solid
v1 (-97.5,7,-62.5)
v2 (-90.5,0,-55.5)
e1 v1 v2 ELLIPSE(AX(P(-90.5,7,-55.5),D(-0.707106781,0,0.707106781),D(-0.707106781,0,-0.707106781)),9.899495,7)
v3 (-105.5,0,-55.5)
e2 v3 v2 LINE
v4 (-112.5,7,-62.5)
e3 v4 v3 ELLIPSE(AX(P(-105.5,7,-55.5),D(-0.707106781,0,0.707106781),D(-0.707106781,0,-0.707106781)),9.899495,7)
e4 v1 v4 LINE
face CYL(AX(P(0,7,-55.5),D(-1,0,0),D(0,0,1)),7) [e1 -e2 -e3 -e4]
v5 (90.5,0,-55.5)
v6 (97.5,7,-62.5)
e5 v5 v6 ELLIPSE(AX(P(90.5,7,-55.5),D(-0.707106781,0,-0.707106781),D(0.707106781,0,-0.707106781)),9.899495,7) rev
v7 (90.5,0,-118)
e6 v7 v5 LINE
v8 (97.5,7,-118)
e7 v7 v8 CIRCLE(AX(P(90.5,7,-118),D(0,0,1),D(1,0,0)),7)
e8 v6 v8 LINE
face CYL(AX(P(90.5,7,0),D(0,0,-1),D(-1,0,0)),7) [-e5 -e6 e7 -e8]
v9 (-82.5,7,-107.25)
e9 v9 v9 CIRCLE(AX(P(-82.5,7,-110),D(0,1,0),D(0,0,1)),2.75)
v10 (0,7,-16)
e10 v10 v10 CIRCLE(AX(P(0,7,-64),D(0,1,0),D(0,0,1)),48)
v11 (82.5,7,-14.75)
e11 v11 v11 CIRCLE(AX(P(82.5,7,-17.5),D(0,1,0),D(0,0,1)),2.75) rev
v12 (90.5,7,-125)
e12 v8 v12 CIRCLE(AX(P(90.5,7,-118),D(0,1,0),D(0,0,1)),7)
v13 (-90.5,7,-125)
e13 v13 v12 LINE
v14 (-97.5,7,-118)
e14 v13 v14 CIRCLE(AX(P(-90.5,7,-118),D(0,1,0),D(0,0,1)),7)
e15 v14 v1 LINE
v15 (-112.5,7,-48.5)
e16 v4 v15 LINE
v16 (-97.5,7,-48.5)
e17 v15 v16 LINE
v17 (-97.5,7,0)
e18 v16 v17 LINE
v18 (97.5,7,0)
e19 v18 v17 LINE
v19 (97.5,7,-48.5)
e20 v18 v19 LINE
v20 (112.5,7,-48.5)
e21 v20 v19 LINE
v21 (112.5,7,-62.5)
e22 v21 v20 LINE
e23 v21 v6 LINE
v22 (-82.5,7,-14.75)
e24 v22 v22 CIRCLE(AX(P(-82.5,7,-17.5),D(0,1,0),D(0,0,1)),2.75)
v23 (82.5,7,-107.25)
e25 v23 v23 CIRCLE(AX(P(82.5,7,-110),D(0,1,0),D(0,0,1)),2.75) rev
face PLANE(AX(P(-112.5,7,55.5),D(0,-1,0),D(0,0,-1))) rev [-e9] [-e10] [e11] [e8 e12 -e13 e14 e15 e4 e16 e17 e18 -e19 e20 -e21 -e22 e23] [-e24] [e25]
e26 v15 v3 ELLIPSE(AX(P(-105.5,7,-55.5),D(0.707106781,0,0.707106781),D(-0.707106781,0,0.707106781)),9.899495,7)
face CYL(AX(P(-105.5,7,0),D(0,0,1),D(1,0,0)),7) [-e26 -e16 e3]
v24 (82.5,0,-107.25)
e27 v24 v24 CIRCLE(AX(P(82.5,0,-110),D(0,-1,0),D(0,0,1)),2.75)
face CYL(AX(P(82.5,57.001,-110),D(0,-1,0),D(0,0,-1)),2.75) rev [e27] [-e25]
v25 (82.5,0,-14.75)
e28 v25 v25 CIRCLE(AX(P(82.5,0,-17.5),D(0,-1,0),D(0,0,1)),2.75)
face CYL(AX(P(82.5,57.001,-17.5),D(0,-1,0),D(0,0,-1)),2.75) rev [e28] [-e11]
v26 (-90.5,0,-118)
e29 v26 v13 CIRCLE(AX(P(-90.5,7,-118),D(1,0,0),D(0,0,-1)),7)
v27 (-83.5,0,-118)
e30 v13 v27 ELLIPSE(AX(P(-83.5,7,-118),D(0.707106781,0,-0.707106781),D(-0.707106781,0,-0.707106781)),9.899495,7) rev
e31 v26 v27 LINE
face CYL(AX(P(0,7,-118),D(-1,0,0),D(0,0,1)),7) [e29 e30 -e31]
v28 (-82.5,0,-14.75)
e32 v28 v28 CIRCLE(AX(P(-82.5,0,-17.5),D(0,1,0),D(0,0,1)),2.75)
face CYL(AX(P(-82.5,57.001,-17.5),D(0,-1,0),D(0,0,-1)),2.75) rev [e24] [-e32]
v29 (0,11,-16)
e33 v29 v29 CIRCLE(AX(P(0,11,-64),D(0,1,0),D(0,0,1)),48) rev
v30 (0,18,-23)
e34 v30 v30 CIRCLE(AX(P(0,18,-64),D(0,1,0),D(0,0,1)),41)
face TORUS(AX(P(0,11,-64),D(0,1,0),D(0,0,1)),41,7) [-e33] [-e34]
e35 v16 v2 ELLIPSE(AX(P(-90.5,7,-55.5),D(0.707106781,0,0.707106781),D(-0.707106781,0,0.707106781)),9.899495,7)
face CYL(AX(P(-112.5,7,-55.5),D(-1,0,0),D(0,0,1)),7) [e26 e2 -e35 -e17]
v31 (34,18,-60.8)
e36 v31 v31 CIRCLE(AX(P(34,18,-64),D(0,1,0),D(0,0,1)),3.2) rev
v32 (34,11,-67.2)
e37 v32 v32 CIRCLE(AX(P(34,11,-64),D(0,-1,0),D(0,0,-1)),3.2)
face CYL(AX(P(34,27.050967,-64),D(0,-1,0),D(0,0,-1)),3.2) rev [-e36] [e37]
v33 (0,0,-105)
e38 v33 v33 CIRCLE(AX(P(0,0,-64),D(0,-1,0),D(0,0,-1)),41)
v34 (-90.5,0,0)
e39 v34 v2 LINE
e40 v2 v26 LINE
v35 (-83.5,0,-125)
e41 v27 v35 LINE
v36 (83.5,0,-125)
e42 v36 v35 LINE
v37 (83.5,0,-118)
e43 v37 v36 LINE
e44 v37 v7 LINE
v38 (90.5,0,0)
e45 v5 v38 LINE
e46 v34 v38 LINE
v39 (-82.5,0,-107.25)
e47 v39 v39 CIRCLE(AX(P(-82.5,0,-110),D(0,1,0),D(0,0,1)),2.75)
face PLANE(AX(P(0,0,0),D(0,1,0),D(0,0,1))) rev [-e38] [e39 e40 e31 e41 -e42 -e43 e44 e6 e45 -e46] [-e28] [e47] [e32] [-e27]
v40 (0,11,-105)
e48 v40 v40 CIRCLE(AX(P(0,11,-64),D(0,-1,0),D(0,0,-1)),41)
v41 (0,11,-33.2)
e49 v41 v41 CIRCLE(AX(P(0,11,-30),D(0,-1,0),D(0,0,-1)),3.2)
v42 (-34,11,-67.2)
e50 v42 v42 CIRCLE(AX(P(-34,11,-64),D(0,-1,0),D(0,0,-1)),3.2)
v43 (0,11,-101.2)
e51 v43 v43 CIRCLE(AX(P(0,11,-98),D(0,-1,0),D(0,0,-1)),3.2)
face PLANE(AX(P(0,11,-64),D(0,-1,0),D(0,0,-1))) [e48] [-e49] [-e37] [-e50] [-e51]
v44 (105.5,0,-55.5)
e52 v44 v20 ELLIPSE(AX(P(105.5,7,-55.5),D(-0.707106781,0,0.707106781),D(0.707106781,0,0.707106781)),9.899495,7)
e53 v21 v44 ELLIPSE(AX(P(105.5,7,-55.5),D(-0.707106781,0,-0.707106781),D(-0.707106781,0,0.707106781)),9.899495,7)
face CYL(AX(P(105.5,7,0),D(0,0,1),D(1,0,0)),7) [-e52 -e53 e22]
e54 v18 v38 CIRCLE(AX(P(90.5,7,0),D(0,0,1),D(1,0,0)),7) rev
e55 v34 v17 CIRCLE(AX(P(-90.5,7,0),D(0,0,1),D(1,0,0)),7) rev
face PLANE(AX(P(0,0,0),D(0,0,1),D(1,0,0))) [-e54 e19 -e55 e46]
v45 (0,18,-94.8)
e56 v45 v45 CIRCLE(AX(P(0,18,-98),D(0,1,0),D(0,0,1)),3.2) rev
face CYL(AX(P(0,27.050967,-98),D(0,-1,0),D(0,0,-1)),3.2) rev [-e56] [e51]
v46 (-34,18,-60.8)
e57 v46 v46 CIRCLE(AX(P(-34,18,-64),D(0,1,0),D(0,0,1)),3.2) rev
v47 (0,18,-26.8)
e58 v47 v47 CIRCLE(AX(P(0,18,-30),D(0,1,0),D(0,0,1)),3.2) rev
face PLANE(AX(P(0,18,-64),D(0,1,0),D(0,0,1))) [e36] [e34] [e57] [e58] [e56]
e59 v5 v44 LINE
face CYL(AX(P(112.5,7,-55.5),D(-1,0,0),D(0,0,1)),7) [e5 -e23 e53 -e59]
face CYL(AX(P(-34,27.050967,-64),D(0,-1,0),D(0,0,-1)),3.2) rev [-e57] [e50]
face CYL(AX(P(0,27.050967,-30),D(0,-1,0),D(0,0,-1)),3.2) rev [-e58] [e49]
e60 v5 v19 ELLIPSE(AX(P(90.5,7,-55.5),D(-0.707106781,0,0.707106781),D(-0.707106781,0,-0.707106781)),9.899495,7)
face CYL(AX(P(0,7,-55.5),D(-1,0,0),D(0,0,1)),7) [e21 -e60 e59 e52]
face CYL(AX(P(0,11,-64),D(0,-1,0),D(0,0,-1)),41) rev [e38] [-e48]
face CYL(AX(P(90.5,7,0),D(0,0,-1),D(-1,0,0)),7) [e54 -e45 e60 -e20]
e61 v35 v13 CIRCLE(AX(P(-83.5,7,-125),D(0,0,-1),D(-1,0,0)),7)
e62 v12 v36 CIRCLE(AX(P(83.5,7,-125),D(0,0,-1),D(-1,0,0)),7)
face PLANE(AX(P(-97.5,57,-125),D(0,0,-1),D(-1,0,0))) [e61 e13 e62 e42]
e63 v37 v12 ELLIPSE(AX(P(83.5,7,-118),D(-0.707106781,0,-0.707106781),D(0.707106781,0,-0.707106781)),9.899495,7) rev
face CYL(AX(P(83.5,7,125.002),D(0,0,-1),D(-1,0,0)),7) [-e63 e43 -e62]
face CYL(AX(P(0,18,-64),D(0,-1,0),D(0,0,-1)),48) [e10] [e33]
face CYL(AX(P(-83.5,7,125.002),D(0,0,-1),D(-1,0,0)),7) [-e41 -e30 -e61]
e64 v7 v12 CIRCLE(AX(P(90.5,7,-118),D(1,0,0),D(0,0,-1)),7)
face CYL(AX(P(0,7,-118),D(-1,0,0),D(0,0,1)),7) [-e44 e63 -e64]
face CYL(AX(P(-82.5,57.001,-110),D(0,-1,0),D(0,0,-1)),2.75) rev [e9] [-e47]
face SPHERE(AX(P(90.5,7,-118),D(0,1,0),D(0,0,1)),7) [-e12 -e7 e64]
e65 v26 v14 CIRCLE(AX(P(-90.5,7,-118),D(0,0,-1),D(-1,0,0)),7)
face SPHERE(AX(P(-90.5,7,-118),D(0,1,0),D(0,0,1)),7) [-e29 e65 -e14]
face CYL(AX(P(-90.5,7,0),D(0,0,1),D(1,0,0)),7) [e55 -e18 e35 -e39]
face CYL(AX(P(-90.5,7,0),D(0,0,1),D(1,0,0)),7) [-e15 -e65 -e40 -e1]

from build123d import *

# Parameters (mm, degrees)
SKETCH2_W               = 195
SKETCH2_H               = 125
BOSS_EXTRUDE1_DEPTH     = 57
SKETCH3_W               = 181
SKETCH3_H               = 118
CUT_EXTRUDE1_DEPTH      = 50
BOSS_EXTRUDE2_DEPTH     = 15
CUT_EXTRUDE4_REACH      = 179.568
SKETCH7_R               = 2.75
SKETCH34_R              = 2
SKETCH34_W              = 22
SKETCH34_H              = 42
CUT_EXTRUDE8_DEPTH      = 7
MIRROR2_COPY_1_DEPTH    = 15
MIRROR2_COPY_2_REACH    = 179.568
MIRROR2_COPY_2_SKETCH_R = 2.75
MIRROR2_COPY_3_SKETCH_R = 2
MIRROR2_COPY_3_SKETCH_W = 22
MIRROR2_COPY_3_SKETCH_H = 42
MIRROR2_COPY_3_DEPTH    = 7
FILLET2_R               = 7
FILLET7_R               = 7
BOSS_EXTRUDE8_REACH     = 282.009
BOSS_EXTRUDE9_REACH     = 282.009
SKETCH29_W              = 460.325022979
SKETCH29_H              = 444.411594697
CUT_EXTRUDE5_DEPTH      = 50
SKETCH30_R              = 48
BOSS_EXTRUDE10_DEPTH    = 11
SKETCH31_R              = 41
CUT_EXTRUDE6_DEPTH      = 11
SKETCH32_R              = 3.2
CUT_EXTRUDE7_DEPTH      = 7
FILLET8_R               = 7
FILLET11_R              = 6.3
SKETCH37_W              = 42
SKETCH37_H              = 75
BOSS_EXTRUDE11_DEPTH    = 7
SKETCH39_W              = 259.645658498
SKETCH39_H              = 116.30884873
CUT_EXTRUDE9_DEPTH      = 125


with BuildPart() as part:
    # Sketch2 → Boss-Extrude1 (new body)
    with BuildSketch(Plane(origin=(0, 0, 0), x_dir=(1, 0, 0), z_dir=(0, 1, 0))):
        with Locations((0, -62.5)):
            Rectangle(SKETCH2_W, SKETCH2_H)
    boss_extrude1 = extrude(amount=BOSS_EXTRUDE1_DEPTH)

    # Sketch3 → Cut-Extrude1 (cut)
    with BuildSketch(Plane(origin=(0, 57, 0), x_dir=(1, 0, 0), z_dir=(0, 1, 0))):
        with Locations((0, -59)):
            Rectangle(SKETCH3_W, SKETCH3_H)
    cut_extrude1 = extrude(amount=-CUT_EXTRUDE1_DEPTH, mode=Mode.SUBTRACT)

    # Sketch5 → Boss-Extrude2 (add)
    with BuildSketch(Plane.ZY.offset(97.5)):
        Polygon((48.5, 7), (48.5, 0), (62.5, 0), (62.5, 57), (55.5, 57), (55.5, 7), align=None)
    boss_extrude2 = extrude(amount=BOSS_EXTRUDE2_DEPTH)

    # Sketch7 → Cut-Extrude4 (cut, up to next)
    with BuildSketch(Plane.XZ, mode=Mode.PRIVATE) as cut_extrude4_sk1:
        with Locations(Location((-82.5, 17.5, 0), (0, 0, 270))):
            Circle(SKETCH7_R)
    cut_extrude4_tool1 = extrude(cut_extrude4_sk1.sketch, amount=-CUT_EXTRUDE4_REACH, mode=Mode.PRIVATE) & part.part
    # Sketch7 → Cut-Extrude4 (cut, up to next)
    with BuildSketch(Plane.XZ, mode=Mode.PRIVATE) as cut_extrude4_sk2:
        with Locations(Location((-82.5, 110, 0), (0, 0, 270))):
            Circle(SKETCH7_R)
    cut_extrude4_tool2 = extrude(cut_extrude4_sk2.sketch, amount=-CUT_EXTRUDE4_REACH, mode=Mode.PRIVATE) & part.part
    cut_extrude4_1 = cut_extrude4_tool1.solids().sort_by_distance((-82.5, 0, 17.5))[0]
    add(cut_extrude4_1, mode=Mode.SUBTRACT)
    cut_extrude4_2 = cut_extrude4_tool2.solids().sort_by_distance((-82.5, 0, 110))[0]
    add(cut_extrude4_2, mode=Mode.SUBTRACT)
    cut_extrude4 = cut_extrude4_1 + cut_extrude4_2  # Cut-Extrude4 as one shape, for the pattern or mirror that repeats it

    # Sketch34 → Cut-Extrude8 (cut)
    with BuildSketch(Plane.XZ):
        with Locations(Location((-57.3, 88.85, 0), (0, 0, 270))):
            Circle(SKETCH34_R)
        with Locations(Location((-67.3, 88.85, 0), (0, 0, 270))):
            Circle(SKETCH34_R)
        with Locations(Location((-78.45, 63.75, 0), (0, 0, 270))):
            Circle(SKETCH34_R)
        with Locations(Location((-46.15, 63.75, 0), (0, 0, 270))):
            Circle(SKETCH34_R)
        with Locations(Location((-57.3, 38.65, 0), (0, 0, 270))):
            Circle(SKETCH34_R)
        with Locations(Location((-67.3, 38.65, 0), (0, 0, 270))):
            Circle(SKETCH34_R)
        with Locations((-62.3, 63.75)):
            Rectangle(SKETCH34_W, SKETCH34_H)
    cut_extrude8 = extrude(amount=-CUT_EXTRUDE8_DEPTH, mode=Mode.SUBTRACT)

    # Mirror1: Boss-Extrude2, Cut-Extrude4, Cut-Extrude8 across plane
    add(boss_extrude2.mirror(Plane(origin=(0, 0, 0), x_dir=(0, 0, 1), z_dir=(1, 0, 0))))
    add(cut_extrude4.mirror(Plane(origin=(0, 0, 0), x_dir=(0, 0, 1), z_dir=(1, 0, 0))), mode=Mode.SUBTRACT)
    add(cut_extrude8.mirror(Plane(origin=(0, 0, 0), x_dir=(0, 0, 1), z_dir=(1, 0, 0))), mode=Mode.SUBTRACT)

    # Mirror2: Boss-Extrude1, Cut-Extrude1, Boss-Extrude2, Cut-Extrude4, Cut-Extrude8 across plane
    add(boss_extrude1.mirror(Plane.XY))
    add(cut_extrude1.mirror(Plane.XY), mode=Mode.SUBTRACT)
    add(boss_extrude2.mirror(Plane.XY))
    add(cut_extrude4.mirror(Plane.XY), mode=Mode.SUBTRACT)
    add(cut_extrude8.mirror(Plane.XY), mode=Mode.SUBTRACT)

    # Mirror2 copy 1 sketch → Mirror2 copy 1 (add)
    with BuildSketch(Plane(origin=(97.5, 0, 0), x_dir=(0, 0, -1), z_dir=(1, 0, 0))):
        Polygon((48.5, 7), (48.5, 0), (62.5, 0), (62.5, 57), (55.5, 57), (55.5, 7), align=None)
    extrude(amount=MIRROR2_COPY_1_DEPTH)

    # Mirror2 copy 2 sketch → Mirror2 copy 2 (cut, up to next)
    with BuildSketch(Plane(origin=(0, 0, 0), x_dir=(-1, 0, 0), z_dir=(0, -1, 0)), mode=Mode.PRIVATE) as mirror2_copy_2_sk1:
        with Locations(Location((-82.5, 17.5, 0), (0, 0, 270))):
            Circle(MIRROR2_COPY_2_SKETCH_R)
    mirror2_copy_2_tool1 = extrude(mirror2_copy_2_sk1.sketch, amount=-MIRROR2_COPY_2_REACH, mode=Mode.PRIVATE) & part.part
    # Mirror2 copy 2 sketch → Mirror2 copy 2 (cut, up to next)
    with BuildSketch(Plane(origin=(0, 0, 0), x_dir=(-1, 0, 0), z_dir=(0, -1, 0)), mode=Mode.PRIVATE) as mirror2_copy_2_sk2:
        with Locations(Location((-82.5, 110, 0), (0, 0, 270))):
            Circle(MIRROR2_COPY_2_SKETCH_R)
    mirror2_copy_2_tool2 = extrude(mirror2_copy_2_sk2.sketch, amount=-MIRROR2_COPY_2_REACH, mode=Mode.PRIVATE) & part.part
    add(mirror2_copy_2_tool1.solids().sort_by_distance((82.5, 0, -17.5))[0], mode=Mode.SUBTRACT)
    add(mirror2_copy_2_tool2.solids().sort_by_distance((82.5, 0, -110))[0], mode=Mode.SUBTRACT)

    # Mirror2 copy 3 sketch → Mirror2 copy 3 (cut)
    with BuildSketch(Plane(origin=(0, 0, 0), x_dir=(-1, 0, 0), z_dir=(0, -1, 0))):
        with Locations(Location((-57.3, 88.85, 0), (0, 0, 270))):
            Circle(MIRROR2_COPY_3_SKETCH_R)
        with Locations(Location((-67.3, 88.85, 0), (0, 0, 270))):
            Circle(MIRROR2_COPY_3_SKETCH_R)
        with Locations(Location((-78.45, 63.75, 0), (0, 0, 270))):
            Circle(MIRROR2_COPY_3_SKETCH_R)
        with Locations(Location((-46.15, 63.75, 0), (0, 0, 270))):
            Circle(MIRROR2_COPY_3_SKETCH_R)
        with Locations(Location((-57.3, 38.65, 0), (0, 0, 270))):
            Circle(MIRROR2_COPY_3_SKETCH_R)
        with Locations(Location((-67.3, 38.65, 0), (0, 0, 270))):
            Circle(MIRROR2_COPY_3_SKETCH_R)
        with Locations((-62.3, 63.75)):
            Rectangle(MIRROR2_COPY_3_SKETCH_W, MIRROR2_COPY_3_SKETCH_H)
    extrude(amount=-MIRROR2_COPY_3_DEPTH, mode=Mode.SUBTRACT)

    # Fillet2
    fillet2_edges = [part.edges().sort_by_distance(p)[0] for p in [
        (-97.5, 28.5, -125),
        (97.5, 28.5, -125),
        (97.5, 28.5, 125),
        (-97.5, 28.5, 125),
    ]]
    fillet(fillet2_edges, radius=FILLET2_R)

    # Fillet7
    fillet7_edges = [part.edges().sort_by_distance(p)[0] for p in [
        (97.5, 0, 0),
        (-97.5, 0, 0),
        (97.5, 0, -90.25),
        (-97.5, 0, 90.25),
        (97.5, 0, 90.25),
        (-97.5, 0, -90.25),
        (0, 0, -125),
        (0, 0, 125),
        (112.5, 0, 55.5),
        (105, 0, 62.5),
        (105, 0, 48.5),
        (-112.5, 0, -55.5),
        (-105, 0, -62.5),
        (-105, 0, -48.5),
        (105, 0, -48.5),
        (105, 0, -62.5),
        (112.5, 0, -55.5),
        (-105, 0, 48.5),
        (-105, 0, 62.5),
        (-95.449747468, 0, 122.949747468),
        (-95.449747468, 0, -122.949747468),
        (95.449747468, 0, -122.949747468),
        (95.449747468, 0, 122.949747468),
        (-112.5, 0, 55.5),
    ]]
    fillet(fillet7_edges, radius=FILLET7_R - 0.0001)  # a hair under: the kernel refuses the full size

    # Sketch26 → Boss-Extrude8 (add, up to next)
    with BuildSketch(Plane.XY.offset(125), mode=Mode.PRIVATE) as boss_extrude8_sk1:
        with BuildLine():
            Line((-90.5, 7), (90.5, 7))
            ThreePointArc((90.5, 7), (88.449747468, 2.050252532), (83.5, 0))
            Line((83.5, 0), (-83.5, 0))
            ThreePointArc((-83.5, 0), (-88.449747468, 2.050252532), (-90.5, 7))
        make_face()
    boss_extrude8_tool1 = extrude(boss_extrude8_sk1.sketch, amount=-BOSS_EXTRUDE8_REACH, mode=Mode.PRIVATE) - part.part
    add(boss_extrude8_tool1.solids().sort_by_distance((0, 3.532685, 125))[0])

    # Sketch27 → Boss-Extrude9 (add, up to next)
    with BuildSketch(Plane(origin=(0, 0, -125), x_dir=(-1, 0, 0), z_dir=(0, 0, -1)), mode=Mode.PRIVATE) as boss_extrude9_sk1:
        with BuildLine():
            Line((-90.5, 7), (90.5, 7))
            ThreePointArc((90.5, 7), (88.449747468, 2.050252532), (83.5, 0))
            Line((83.5, 0), (-83.5, 0))
            ThreePointArc((-83.5, 0), (-88.449747468, 2.050252532), (-90.5, 7))
        make_face()
    boss_extrude9_tool1 = extrude(boss_extrude9_sk1.sketch, amount=-BOSS_EXTRUDE9_REACH, mode=Mode.PRIVATE) - part.part
    add(boss_extrude9_tool1.solids().sort_by_distance((0, 3.532685, -125))[0])

    # Sketch29 → Cut-Extrude5 (cut)
    with BuildSketch(Plane(origin=(0, 57, 0), x_dir=(1, 0, 0), z_dir=(0, 1, 0))):
        with Locations((1.552529588, 6.210118353)):
            Rectangle(SKETCH29_W, SKETCH29_H)
    extrude(amount=-CUT_EXTRUDE5_DEPTH, mode=Mode.SUBTRACT)

    # Sketch30 → Boss-Extrude10 (add)
    with BuildSketch(Plane(origin=(0, 7, 0), x_dir=(1, 0, 0), z_dir=(0, 1, 0))):
        with Locations(Location((0, 64, 0), (0, 0, 0.616739929))):
            Circle(SKETCH30_R)
    extrude(amount=BOSS_EXTRUDE10_DEPTH)

    # Sketch31 → Cut-Extrude6 (cut)
    with BuildSketch(Plane.XZ):
        with Locations(Location((0, -64, 0), (0, 0, 270))):
            Circle(SKETCH31_R)
    extrude(amount=-CUT_EXTRUDE6_DEPTH, mode=Mode.SUBTRACT)

    # Sketch32 → Cut-Extrude7 (cut)
    with BuildSketch(Plane.XZ.offset(-11)):
        with Locations(Location((0, -30, 0), (0, 0, 270))):
            Circle(SKETCH32_R)
        with Locations(Location((0, -98, 0), (0, 0, 270))):
            Circle(SKETCH32_R)
        with Locations(Location((34, -64, 0), (0, 0, 270))):
            Circle(SKETCH32_R)
        with Locations(Location((-34, -64, 0), (0, 0, 270))):
            Circle(SKETCH32_R)
    extrude(amount=-CUT_EXTRUDE7_DEPTH, mode=Mode.SUBTRACT)

    # Fillet8
    fillet8_edges = [part.edges().sort_by_distance(p)[0] for p in [
        (-47.997219225, 18, -63.483331143),
    ]]
    fillet(fillet8_edges, radius=FILLET8_R)

    # Fillet11
    fillet11_edges = [part.edges().sort_by_distance(p)[0] for p in [
        (73.3, 3.5, 84.75),
        (73.3, 3.5, 42.75),
        (51.3, 3.5, 42.75),
        (51.3, 3.5, 84.75),
        (-51.3, 3.5, 42.75),
        (-51.3, 3.5, 84.75),
        (-73.3, 3.5, 84.75),
        (-73.3, 3.5, 42.75),
    ]]
    fillet(fillet11_edges, radius=FILLET11_R)

    # Sketch37 → Boss-Extrude11 (add)
    with BuildSketch(Plane.XZ):
        with Locations((64.5, -62.5)):
            Rectangle(SKETCH37_W, SKETCH37_H)
        with Locations((-64.5, -62.5)):
            Rectangle(SKETCH37_W, SKETCH37_H)
    extrude(amount=-BOSS_EXTRUDE11_DEPTH)

    # Sketch39 → Cut-Extrude9 (cut)
    with BuildSketch(Plane.XY.offset(125)):
        with Locations((-5.095435278, 8.271148339)):
            Rectangle(SKETCH39_W, SKETCH39_H)
    extrude(amount=-CUT_EXTRUDE9_DEPTH, mode=Mode.SUBTRACT)


solid = part.part
